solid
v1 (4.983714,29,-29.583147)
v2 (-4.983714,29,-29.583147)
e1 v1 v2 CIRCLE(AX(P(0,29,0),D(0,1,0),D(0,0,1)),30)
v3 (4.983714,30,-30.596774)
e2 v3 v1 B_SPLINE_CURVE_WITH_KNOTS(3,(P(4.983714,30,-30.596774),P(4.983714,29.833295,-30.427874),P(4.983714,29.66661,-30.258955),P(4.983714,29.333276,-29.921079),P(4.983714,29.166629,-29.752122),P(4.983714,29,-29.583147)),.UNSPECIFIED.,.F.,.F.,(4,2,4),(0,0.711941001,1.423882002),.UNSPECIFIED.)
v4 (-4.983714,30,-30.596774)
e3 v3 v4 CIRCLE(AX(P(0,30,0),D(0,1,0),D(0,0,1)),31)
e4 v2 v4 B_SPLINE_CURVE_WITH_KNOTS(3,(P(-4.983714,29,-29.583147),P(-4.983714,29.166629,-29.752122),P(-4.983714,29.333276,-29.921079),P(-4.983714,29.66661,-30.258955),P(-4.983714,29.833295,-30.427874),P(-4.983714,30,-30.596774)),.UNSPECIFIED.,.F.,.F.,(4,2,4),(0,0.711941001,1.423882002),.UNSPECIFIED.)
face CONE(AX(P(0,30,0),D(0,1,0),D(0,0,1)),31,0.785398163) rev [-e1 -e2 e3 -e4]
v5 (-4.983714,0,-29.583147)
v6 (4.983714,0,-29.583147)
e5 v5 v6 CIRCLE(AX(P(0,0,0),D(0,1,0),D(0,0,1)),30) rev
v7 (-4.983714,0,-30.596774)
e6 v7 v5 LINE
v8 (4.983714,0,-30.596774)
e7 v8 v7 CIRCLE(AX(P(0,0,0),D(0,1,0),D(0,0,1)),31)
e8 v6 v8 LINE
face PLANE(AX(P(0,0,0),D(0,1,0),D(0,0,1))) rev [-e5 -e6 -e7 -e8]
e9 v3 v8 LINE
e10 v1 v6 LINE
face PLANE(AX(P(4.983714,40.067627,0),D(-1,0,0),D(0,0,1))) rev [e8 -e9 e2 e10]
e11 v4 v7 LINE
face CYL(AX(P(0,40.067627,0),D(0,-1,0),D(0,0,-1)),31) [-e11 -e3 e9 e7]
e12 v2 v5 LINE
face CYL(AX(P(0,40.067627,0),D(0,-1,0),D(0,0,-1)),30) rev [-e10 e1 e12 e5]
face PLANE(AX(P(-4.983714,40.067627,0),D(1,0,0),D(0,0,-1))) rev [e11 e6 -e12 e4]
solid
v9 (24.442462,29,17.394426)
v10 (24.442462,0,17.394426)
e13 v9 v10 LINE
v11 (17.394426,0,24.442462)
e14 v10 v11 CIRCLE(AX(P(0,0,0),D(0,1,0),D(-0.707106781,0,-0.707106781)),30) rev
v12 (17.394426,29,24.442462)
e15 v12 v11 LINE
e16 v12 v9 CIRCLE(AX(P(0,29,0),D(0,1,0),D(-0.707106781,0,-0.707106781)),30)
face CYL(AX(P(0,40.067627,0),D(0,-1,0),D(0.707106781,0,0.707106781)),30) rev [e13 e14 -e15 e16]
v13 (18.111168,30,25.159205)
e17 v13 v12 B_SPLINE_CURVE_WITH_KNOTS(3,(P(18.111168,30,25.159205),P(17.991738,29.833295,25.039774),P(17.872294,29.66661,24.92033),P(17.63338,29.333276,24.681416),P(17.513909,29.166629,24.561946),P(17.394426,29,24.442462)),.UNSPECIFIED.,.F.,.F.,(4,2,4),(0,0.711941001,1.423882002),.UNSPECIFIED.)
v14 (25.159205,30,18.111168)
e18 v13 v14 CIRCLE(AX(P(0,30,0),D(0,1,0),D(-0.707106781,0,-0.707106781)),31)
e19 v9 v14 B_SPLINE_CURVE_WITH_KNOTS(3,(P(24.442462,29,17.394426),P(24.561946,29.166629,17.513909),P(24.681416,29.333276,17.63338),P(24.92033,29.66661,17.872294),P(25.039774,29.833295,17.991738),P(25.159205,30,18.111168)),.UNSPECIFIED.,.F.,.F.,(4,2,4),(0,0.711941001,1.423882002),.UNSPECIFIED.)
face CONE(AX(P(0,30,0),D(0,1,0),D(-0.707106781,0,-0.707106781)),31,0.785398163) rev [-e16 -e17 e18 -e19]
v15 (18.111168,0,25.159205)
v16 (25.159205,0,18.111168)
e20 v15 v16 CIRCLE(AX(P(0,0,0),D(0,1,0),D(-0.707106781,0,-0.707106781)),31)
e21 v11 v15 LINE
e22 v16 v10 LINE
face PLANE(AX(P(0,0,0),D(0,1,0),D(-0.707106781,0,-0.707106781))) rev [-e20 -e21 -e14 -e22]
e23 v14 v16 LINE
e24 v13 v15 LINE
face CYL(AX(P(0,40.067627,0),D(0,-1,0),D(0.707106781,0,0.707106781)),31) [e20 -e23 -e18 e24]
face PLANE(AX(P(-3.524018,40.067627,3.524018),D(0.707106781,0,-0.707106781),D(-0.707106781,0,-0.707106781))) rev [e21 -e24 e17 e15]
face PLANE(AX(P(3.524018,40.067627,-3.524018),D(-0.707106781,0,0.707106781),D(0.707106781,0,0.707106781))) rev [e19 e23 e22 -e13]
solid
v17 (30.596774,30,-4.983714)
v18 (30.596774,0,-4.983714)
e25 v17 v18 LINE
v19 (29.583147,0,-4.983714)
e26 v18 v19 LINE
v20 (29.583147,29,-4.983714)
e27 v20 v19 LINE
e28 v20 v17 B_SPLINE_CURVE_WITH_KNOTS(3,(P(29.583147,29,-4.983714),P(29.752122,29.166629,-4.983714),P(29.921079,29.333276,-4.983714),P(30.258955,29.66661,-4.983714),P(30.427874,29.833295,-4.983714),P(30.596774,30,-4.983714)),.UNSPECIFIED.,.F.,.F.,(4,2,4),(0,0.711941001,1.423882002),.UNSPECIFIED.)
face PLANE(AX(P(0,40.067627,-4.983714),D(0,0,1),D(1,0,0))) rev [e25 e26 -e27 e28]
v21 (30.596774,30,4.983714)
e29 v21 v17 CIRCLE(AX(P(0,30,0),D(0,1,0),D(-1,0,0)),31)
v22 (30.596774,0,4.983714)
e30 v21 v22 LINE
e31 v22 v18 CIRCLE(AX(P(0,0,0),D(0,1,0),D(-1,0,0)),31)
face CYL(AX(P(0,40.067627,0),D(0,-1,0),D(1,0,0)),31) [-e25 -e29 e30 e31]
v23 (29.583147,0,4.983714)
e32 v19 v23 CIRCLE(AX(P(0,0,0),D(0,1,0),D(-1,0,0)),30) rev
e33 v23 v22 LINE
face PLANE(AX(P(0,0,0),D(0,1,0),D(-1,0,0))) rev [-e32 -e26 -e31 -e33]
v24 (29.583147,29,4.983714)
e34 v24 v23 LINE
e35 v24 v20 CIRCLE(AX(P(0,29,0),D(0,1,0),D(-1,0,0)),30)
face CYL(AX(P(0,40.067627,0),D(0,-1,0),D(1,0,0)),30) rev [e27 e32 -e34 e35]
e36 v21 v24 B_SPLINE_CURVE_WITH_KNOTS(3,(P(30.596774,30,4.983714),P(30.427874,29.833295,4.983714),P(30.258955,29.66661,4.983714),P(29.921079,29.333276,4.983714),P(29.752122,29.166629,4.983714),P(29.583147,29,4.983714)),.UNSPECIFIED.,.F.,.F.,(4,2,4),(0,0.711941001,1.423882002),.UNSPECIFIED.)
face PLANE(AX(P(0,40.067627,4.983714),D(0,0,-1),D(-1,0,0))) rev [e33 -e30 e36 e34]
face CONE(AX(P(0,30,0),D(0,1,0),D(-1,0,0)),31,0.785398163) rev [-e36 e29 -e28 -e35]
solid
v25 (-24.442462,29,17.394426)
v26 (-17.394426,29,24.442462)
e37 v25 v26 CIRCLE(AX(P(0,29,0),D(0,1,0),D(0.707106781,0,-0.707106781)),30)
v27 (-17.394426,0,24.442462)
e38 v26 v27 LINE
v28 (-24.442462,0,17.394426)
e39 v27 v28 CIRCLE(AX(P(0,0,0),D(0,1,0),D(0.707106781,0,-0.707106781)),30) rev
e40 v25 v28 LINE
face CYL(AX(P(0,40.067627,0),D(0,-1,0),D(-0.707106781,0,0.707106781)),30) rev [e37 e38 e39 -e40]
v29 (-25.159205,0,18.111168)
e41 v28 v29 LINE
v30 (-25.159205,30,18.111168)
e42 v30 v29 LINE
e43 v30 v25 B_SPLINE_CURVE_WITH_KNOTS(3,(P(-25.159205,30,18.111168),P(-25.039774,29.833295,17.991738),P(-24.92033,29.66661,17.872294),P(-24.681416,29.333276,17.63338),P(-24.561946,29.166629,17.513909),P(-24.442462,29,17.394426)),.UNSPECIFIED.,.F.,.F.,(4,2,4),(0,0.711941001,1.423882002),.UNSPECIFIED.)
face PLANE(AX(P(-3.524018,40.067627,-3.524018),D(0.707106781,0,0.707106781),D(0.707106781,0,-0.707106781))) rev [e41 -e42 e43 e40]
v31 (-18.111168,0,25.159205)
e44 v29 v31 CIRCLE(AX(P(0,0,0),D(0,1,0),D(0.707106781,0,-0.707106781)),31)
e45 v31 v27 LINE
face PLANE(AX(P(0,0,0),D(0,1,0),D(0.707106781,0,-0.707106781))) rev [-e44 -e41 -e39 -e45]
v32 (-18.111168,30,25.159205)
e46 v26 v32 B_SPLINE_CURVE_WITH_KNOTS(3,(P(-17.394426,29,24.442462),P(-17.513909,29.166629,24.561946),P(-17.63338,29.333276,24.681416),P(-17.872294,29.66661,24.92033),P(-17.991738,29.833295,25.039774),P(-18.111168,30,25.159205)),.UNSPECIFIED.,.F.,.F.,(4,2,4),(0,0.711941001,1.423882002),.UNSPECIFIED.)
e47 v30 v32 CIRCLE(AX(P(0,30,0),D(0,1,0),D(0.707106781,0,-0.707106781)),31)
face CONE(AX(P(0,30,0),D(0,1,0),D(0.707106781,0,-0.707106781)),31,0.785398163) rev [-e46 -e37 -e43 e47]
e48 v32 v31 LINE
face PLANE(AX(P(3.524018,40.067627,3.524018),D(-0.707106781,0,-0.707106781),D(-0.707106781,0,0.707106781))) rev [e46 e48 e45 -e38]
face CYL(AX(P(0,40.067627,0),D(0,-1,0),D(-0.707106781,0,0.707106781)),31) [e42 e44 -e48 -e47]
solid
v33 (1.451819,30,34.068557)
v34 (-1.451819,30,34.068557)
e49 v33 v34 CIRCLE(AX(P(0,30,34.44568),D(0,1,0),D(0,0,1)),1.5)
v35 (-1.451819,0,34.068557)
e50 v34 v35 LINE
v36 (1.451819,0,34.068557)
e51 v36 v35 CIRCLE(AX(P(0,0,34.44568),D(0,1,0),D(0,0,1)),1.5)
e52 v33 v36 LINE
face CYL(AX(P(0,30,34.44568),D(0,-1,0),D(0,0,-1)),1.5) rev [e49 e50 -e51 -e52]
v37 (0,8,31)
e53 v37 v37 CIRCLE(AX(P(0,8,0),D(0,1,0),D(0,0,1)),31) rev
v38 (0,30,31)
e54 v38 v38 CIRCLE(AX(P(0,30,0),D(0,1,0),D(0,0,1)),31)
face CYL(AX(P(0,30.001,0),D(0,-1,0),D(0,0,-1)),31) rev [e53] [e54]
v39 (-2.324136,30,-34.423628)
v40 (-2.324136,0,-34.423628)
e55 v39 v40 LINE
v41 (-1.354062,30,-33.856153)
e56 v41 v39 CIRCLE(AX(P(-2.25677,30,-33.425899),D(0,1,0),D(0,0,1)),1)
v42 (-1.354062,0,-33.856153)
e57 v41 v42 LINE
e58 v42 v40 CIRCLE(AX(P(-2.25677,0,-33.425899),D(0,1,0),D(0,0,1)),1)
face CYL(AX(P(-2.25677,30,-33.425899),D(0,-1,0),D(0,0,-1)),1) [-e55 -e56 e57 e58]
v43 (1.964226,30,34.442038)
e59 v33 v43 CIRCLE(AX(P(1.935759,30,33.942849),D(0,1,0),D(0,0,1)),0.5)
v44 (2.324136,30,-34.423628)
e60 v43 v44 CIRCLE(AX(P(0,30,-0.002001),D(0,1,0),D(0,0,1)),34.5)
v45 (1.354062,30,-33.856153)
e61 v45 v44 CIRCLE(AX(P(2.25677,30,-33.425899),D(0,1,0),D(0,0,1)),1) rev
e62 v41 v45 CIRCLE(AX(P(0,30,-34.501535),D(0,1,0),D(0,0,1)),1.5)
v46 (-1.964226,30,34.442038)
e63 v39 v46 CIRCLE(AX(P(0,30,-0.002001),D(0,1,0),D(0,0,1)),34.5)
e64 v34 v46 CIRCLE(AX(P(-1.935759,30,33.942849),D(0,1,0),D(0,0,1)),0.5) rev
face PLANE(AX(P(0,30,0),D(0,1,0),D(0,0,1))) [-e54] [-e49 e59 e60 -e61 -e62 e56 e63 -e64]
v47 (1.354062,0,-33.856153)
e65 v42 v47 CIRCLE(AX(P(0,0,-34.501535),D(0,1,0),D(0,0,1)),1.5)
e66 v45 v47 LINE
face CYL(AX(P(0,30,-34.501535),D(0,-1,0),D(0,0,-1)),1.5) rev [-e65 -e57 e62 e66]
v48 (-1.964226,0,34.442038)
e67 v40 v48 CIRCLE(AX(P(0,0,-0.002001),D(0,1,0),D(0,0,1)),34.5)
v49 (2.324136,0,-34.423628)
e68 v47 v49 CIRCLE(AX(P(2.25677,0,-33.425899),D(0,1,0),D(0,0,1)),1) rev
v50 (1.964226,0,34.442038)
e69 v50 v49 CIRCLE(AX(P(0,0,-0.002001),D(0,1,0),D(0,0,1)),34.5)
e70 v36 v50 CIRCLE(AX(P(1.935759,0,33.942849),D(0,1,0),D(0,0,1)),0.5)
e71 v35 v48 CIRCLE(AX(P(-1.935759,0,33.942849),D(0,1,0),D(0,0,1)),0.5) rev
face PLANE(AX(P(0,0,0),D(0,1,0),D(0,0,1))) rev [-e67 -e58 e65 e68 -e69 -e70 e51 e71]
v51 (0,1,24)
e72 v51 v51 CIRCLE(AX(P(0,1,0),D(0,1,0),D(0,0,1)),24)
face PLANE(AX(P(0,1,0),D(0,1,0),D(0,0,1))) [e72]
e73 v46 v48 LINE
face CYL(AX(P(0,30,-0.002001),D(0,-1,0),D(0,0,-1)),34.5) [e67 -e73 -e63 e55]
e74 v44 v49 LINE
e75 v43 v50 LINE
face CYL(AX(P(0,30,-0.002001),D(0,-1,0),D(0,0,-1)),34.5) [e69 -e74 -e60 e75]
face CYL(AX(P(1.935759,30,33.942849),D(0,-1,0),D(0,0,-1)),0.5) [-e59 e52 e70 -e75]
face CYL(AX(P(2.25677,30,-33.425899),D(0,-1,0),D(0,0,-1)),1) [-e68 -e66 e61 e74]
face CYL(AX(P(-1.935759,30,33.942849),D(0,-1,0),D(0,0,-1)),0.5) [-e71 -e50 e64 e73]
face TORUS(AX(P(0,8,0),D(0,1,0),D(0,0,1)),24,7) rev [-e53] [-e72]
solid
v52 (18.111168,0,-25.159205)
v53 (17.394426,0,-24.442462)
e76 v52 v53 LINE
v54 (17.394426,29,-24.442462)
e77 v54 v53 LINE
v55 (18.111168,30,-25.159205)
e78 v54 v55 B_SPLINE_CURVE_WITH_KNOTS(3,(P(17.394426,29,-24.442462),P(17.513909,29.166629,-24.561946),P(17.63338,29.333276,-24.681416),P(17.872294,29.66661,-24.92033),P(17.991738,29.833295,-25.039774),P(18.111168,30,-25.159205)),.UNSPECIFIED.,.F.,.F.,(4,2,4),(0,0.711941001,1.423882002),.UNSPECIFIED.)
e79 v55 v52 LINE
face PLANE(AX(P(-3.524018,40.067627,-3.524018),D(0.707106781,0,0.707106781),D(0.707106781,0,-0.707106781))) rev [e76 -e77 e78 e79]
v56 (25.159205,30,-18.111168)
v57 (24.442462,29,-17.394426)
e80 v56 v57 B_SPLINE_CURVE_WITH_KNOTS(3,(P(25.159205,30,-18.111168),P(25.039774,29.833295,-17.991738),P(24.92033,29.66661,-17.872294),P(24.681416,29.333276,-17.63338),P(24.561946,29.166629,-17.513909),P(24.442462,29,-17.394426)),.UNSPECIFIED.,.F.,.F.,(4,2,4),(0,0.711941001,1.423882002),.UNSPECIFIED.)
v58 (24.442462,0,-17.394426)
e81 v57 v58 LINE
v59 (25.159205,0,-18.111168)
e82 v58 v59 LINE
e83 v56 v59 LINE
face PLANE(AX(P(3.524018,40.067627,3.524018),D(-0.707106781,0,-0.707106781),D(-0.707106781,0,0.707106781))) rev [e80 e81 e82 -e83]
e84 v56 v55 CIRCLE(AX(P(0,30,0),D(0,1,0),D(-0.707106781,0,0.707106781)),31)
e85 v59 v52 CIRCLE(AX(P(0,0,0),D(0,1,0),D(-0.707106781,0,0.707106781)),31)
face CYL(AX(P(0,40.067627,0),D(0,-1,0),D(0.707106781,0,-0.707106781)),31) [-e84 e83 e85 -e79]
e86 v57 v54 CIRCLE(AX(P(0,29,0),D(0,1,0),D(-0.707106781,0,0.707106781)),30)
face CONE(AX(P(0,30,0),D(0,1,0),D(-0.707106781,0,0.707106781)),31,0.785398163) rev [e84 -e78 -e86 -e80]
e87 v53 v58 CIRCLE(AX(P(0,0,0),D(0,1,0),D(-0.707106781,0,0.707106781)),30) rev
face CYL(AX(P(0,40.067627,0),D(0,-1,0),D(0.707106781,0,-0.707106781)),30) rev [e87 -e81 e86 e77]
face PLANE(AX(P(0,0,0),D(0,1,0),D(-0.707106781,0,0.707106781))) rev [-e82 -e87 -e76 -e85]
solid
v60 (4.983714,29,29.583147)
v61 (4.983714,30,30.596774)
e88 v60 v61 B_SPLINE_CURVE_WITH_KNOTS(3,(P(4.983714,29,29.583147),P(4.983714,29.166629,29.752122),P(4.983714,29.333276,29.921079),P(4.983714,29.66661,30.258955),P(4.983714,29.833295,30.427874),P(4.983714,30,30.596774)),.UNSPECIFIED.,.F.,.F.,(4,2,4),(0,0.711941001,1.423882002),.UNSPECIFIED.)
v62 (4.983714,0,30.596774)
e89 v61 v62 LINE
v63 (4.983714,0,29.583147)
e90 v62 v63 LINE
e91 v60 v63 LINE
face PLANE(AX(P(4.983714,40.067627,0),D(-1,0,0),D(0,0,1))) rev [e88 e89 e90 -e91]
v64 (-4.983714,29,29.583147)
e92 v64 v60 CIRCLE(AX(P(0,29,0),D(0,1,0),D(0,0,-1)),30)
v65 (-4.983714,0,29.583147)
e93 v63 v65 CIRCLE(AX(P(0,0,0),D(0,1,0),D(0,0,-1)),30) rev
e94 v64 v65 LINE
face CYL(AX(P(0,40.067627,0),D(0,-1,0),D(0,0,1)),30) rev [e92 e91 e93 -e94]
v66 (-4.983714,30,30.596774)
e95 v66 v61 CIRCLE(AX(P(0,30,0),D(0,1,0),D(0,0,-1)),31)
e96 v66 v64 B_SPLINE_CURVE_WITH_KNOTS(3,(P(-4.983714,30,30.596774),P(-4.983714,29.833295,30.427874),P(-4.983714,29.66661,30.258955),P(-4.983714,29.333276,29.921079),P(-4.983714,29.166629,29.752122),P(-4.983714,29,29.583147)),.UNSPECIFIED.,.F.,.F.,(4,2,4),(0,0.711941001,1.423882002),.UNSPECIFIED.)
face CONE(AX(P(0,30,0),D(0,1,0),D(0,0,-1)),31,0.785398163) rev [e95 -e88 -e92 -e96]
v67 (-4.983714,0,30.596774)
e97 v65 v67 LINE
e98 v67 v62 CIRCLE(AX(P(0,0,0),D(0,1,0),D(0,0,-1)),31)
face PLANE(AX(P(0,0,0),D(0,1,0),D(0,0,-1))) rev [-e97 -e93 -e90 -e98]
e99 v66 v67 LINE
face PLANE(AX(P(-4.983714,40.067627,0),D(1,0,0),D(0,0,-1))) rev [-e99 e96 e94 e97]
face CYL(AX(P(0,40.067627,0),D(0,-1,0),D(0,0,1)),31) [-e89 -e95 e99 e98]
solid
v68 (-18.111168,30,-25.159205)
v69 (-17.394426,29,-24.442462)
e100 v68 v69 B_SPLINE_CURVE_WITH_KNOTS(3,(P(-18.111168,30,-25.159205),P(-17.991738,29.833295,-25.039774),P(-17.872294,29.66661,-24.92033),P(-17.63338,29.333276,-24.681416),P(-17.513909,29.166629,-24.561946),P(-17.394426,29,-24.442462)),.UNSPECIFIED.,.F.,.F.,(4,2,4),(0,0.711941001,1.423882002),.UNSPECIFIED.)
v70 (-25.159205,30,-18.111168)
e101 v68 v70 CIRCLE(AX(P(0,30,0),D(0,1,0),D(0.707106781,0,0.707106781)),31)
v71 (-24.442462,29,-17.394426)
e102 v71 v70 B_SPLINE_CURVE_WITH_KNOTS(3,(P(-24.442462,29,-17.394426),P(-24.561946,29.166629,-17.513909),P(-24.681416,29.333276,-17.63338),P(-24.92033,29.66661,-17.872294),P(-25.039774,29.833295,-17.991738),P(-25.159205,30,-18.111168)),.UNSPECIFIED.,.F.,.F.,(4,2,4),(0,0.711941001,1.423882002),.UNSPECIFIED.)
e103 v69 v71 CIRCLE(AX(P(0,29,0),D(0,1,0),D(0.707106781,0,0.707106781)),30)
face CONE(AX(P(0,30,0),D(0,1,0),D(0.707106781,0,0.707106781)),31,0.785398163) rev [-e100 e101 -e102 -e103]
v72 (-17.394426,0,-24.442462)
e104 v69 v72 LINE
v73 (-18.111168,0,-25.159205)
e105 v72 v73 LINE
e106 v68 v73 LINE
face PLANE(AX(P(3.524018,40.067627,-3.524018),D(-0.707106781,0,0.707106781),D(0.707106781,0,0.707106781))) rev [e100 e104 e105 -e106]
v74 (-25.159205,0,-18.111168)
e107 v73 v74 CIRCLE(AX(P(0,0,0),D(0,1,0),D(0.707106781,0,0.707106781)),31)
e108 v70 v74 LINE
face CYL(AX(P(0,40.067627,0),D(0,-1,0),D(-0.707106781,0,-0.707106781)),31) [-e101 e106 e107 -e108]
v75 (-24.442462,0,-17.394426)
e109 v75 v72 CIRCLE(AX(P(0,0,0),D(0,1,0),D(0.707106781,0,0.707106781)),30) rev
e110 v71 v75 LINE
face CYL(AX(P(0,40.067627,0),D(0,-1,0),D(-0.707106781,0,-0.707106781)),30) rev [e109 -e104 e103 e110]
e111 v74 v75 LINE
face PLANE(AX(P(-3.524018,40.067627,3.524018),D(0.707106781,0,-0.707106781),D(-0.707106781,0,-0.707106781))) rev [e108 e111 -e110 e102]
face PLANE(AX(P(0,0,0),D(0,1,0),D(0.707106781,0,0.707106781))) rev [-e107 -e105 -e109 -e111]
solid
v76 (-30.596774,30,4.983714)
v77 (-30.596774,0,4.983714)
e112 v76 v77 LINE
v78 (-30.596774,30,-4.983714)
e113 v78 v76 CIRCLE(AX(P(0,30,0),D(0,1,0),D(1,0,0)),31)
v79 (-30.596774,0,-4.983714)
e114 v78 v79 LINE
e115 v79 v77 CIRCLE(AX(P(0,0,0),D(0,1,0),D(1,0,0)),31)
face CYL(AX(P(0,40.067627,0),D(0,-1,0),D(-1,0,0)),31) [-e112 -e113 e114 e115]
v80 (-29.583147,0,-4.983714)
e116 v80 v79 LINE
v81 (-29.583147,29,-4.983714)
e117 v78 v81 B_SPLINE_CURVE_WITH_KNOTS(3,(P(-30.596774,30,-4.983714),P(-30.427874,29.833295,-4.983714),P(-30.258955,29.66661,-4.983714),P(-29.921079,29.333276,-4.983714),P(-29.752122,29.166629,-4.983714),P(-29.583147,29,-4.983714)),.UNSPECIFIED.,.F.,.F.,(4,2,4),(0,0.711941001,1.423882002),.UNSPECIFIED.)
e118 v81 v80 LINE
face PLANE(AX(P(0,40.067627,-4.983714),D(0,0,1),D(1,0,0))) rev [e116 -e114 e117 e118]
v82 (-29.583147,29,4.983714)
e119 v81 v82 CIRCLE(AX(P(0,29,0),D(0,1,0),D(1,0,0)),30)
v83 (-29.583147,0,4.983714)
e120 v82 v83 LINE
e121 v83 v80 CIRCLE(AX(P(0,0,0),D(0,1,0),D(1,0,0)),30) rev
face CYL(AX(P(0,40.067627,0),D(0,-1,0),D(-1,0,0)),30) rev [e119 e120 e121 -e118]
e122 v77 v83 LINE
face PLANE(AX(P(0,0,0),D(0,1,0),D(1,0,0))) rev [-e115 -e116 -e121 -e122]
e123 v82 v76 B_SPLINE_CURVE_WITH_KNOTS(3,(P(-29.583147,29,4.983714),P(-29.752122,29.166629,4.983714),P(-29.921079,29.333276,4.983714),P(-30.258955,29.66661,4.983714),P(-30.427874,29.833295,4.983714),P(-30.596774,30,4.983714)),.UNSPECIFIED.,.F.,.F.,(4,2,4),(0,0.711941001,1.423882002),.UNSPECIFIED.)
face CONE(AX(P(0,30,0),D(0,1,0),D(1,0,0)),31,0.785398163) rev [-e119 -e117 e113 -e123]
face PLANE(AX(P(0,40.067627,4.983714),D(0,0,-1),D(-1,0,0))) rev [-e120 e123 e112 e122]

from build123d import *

# Parameters (mm, degrees)
BOSS_EXTRUDE1_DEPTH = 30
CUT_EXTRUDE2_REACH  = 60.241
CUT_EXTRUDE2_START  = 1
SKETCH2_R           = 31
BOSS_EXTRUDE2_DEPTH = 30
CHAMFER2_SIZE       = 1
CIRPATTERN2_COUNT   = 8
FILLET2_R           = 7


with BuildPart() as part:
    # Sketch1 → Boss-Extrude1 (new body)
    with BuildSketch(Plane(origin=(0, 0, 0), x_dir=(1, 0, 0), z_dir=(0, 1, 0))):
        with BuildLine():
            ThreePointArc((1.451818925, -34.068556857), (1.641248992, -34.346908706), (1.964225605, -34.442038138))
            ThreePointArc((1.964225605, -34.442038138), (34.499528846, -0.178302888), (2.324135821, 34.423627607))
            ThreePointArc((2.324135821, 34.423627607), (1.751838249, 34.289058819), (1.354061739, 33.856153382))
            ThreePointArc((1.354061739, 33.856153382), (0, 33.001534515), (-1.354061739, 33.856153382))
            ThreePointArc((-1.354061739, 33.856153382), (-1.751838249, 34.289058819), (-2.324135821, 34.423627607))
            ThreePointArc((-2.324135821, 34.423627607), (-34.499528846, -0.178302888), (-1.964225605, -34.442038138))
            ThreePointArc((-1.964225605, -34.442038138), (-1.641248992, -34.346908706), (-1.451818925, -34.068556857))
            ThreePointArc((-1.451818925, -34.068556857), (0, -32.945679925), (1.451818925, -34.068556857))
        make_face()
    extrude(amount=BOSS_EXTRUDE1_DEPTH)

    # Sketch2 → Cut-Extrude2 (cut, up to next)
    with BuildSketch(Plane(origin=(0, 0, 0), x_dir=(1, 0, 0), z_dir=(0, 1, 0)).offset(CUT_EXTRUDE2_START), mode=Mode.PRIVATE) as cut_extrude2_sk1:
        with Locations(Location((0, 0, 0), (0, 0, 270))):
            Circle(SKETCH2_R)
    cut_extrude2_tool1 = extrude(cut_extrude2_sk1.sketch, amount=CUT_EXTRUDE2_REACH, mode=Mode.PRIVATE) & part.part
    add(cut_extrude2_tool1.solids().sort_by_distance((0, 1, 0))[0], mode=Mode.SUBTRACT)

    # Fillet2
    fillet2_edges = [part.edges().sort_by_distance(p)[0] for p in [
        (0, 1, -31),
    ]]
    fillet(fillet2_edges, radius=FILLET2_R)


with BuildPart() as body_2:
    # Sketch2<2> → Boss-Extrude2 (new body)
    with BuildSketch(Plane(origin=(0, 0, 0), x_dir=(1, 0, 0), z_dir=(0, 1, 0))):
        with BuildLine():
            ThreePointArc((4.983714373, 30.596774194), (0, 31), (-4.983714373, 30.596774194))
            Line((-4.983714373, 30.596774194), (-4.983714373, 29.583147078))
            ThreePointArc((-4.983714373, 29.583147078), (0, 30), (4.983714373, 29.583147078))
            Line((4.983714373, 29.583147078), (4.983714373, 30.596774194))
        make_face()
    extrude(amount=BOSS_EXTRUDE2_DEPTH)

    # Chamfer2
    chamfer2_edges = [body_2.edges().sort_by_distance(p)[0] for p in [
        (0, 30, -30),
    ]]
    chamfer(chamfer2_edges, length=CHAMFER2_SIZE - 0.0001)  # a hair under: the kernel refuses the full size


with BuildPart() as cirpattern2_1:
    # CirPattern2: pattern copy
    add(body_2.part.rotate(Axis((0, 0, 0), (0, 1, 0)), 1 * 360 / CIRPATTERN2_COUNT))


with BuildPart() as cirpattern2_2:
    # CirPattern2: pattern copy
    add(body_2.part.rotate(Axis((0, 0, 0), (0, 1, 0)), 2 * 360 / CIRPATTERN2_COUNT))


with BuildPart() as cirpattern2_3:
    # CirPattern2: pattern copy
    add(body_2.part.rotate(Axis((0, 0, 0), (0, 1, 0)), 3 * 360 / CIRPATTERN2_COUNT))


with BuildPart() as cirpattern2_4:
    # CirPattern2: pattern copy
    add(body_2.part.rotate(Axis((0, 0, 0), (0, 1, 0)), 4 * 360 / CIRPATTERN2_COUNT))


with BuildPart() as cirpattern2_5:
    # CirPattern2: pattern copy
    add(body_2.part.rotate(Axis((0, 0, 0), (0, 1, 0)), 5 * 360 / CIRPATTERN2_COUNT))


with BuildPart() as cirpattern2_6:
    # CirPattern2: pattern copy
    add(body_2.part.rotate(Axis((0, 0, 0), (0, 1, 0)), 6 * 360 / CIRPATTERN2_COUNT))


with BuildPart() as cirpattern2_7:
    # CirPattern2: pattern copy
    add(body_2.part.rotate(Axis((0, 0, 0), (0, 1, 0)), 7 * 360 / CIRPATTERN2_COUNT))


solid = Compound([part.part, body_2.part, cirpattern2_1.part, cirpattern2_2.part, cirpattern2_3.part, cirpattern2_4.part, cirpattern2_5.part, cirpattern2_6.part, cirpattern2_7.part])
